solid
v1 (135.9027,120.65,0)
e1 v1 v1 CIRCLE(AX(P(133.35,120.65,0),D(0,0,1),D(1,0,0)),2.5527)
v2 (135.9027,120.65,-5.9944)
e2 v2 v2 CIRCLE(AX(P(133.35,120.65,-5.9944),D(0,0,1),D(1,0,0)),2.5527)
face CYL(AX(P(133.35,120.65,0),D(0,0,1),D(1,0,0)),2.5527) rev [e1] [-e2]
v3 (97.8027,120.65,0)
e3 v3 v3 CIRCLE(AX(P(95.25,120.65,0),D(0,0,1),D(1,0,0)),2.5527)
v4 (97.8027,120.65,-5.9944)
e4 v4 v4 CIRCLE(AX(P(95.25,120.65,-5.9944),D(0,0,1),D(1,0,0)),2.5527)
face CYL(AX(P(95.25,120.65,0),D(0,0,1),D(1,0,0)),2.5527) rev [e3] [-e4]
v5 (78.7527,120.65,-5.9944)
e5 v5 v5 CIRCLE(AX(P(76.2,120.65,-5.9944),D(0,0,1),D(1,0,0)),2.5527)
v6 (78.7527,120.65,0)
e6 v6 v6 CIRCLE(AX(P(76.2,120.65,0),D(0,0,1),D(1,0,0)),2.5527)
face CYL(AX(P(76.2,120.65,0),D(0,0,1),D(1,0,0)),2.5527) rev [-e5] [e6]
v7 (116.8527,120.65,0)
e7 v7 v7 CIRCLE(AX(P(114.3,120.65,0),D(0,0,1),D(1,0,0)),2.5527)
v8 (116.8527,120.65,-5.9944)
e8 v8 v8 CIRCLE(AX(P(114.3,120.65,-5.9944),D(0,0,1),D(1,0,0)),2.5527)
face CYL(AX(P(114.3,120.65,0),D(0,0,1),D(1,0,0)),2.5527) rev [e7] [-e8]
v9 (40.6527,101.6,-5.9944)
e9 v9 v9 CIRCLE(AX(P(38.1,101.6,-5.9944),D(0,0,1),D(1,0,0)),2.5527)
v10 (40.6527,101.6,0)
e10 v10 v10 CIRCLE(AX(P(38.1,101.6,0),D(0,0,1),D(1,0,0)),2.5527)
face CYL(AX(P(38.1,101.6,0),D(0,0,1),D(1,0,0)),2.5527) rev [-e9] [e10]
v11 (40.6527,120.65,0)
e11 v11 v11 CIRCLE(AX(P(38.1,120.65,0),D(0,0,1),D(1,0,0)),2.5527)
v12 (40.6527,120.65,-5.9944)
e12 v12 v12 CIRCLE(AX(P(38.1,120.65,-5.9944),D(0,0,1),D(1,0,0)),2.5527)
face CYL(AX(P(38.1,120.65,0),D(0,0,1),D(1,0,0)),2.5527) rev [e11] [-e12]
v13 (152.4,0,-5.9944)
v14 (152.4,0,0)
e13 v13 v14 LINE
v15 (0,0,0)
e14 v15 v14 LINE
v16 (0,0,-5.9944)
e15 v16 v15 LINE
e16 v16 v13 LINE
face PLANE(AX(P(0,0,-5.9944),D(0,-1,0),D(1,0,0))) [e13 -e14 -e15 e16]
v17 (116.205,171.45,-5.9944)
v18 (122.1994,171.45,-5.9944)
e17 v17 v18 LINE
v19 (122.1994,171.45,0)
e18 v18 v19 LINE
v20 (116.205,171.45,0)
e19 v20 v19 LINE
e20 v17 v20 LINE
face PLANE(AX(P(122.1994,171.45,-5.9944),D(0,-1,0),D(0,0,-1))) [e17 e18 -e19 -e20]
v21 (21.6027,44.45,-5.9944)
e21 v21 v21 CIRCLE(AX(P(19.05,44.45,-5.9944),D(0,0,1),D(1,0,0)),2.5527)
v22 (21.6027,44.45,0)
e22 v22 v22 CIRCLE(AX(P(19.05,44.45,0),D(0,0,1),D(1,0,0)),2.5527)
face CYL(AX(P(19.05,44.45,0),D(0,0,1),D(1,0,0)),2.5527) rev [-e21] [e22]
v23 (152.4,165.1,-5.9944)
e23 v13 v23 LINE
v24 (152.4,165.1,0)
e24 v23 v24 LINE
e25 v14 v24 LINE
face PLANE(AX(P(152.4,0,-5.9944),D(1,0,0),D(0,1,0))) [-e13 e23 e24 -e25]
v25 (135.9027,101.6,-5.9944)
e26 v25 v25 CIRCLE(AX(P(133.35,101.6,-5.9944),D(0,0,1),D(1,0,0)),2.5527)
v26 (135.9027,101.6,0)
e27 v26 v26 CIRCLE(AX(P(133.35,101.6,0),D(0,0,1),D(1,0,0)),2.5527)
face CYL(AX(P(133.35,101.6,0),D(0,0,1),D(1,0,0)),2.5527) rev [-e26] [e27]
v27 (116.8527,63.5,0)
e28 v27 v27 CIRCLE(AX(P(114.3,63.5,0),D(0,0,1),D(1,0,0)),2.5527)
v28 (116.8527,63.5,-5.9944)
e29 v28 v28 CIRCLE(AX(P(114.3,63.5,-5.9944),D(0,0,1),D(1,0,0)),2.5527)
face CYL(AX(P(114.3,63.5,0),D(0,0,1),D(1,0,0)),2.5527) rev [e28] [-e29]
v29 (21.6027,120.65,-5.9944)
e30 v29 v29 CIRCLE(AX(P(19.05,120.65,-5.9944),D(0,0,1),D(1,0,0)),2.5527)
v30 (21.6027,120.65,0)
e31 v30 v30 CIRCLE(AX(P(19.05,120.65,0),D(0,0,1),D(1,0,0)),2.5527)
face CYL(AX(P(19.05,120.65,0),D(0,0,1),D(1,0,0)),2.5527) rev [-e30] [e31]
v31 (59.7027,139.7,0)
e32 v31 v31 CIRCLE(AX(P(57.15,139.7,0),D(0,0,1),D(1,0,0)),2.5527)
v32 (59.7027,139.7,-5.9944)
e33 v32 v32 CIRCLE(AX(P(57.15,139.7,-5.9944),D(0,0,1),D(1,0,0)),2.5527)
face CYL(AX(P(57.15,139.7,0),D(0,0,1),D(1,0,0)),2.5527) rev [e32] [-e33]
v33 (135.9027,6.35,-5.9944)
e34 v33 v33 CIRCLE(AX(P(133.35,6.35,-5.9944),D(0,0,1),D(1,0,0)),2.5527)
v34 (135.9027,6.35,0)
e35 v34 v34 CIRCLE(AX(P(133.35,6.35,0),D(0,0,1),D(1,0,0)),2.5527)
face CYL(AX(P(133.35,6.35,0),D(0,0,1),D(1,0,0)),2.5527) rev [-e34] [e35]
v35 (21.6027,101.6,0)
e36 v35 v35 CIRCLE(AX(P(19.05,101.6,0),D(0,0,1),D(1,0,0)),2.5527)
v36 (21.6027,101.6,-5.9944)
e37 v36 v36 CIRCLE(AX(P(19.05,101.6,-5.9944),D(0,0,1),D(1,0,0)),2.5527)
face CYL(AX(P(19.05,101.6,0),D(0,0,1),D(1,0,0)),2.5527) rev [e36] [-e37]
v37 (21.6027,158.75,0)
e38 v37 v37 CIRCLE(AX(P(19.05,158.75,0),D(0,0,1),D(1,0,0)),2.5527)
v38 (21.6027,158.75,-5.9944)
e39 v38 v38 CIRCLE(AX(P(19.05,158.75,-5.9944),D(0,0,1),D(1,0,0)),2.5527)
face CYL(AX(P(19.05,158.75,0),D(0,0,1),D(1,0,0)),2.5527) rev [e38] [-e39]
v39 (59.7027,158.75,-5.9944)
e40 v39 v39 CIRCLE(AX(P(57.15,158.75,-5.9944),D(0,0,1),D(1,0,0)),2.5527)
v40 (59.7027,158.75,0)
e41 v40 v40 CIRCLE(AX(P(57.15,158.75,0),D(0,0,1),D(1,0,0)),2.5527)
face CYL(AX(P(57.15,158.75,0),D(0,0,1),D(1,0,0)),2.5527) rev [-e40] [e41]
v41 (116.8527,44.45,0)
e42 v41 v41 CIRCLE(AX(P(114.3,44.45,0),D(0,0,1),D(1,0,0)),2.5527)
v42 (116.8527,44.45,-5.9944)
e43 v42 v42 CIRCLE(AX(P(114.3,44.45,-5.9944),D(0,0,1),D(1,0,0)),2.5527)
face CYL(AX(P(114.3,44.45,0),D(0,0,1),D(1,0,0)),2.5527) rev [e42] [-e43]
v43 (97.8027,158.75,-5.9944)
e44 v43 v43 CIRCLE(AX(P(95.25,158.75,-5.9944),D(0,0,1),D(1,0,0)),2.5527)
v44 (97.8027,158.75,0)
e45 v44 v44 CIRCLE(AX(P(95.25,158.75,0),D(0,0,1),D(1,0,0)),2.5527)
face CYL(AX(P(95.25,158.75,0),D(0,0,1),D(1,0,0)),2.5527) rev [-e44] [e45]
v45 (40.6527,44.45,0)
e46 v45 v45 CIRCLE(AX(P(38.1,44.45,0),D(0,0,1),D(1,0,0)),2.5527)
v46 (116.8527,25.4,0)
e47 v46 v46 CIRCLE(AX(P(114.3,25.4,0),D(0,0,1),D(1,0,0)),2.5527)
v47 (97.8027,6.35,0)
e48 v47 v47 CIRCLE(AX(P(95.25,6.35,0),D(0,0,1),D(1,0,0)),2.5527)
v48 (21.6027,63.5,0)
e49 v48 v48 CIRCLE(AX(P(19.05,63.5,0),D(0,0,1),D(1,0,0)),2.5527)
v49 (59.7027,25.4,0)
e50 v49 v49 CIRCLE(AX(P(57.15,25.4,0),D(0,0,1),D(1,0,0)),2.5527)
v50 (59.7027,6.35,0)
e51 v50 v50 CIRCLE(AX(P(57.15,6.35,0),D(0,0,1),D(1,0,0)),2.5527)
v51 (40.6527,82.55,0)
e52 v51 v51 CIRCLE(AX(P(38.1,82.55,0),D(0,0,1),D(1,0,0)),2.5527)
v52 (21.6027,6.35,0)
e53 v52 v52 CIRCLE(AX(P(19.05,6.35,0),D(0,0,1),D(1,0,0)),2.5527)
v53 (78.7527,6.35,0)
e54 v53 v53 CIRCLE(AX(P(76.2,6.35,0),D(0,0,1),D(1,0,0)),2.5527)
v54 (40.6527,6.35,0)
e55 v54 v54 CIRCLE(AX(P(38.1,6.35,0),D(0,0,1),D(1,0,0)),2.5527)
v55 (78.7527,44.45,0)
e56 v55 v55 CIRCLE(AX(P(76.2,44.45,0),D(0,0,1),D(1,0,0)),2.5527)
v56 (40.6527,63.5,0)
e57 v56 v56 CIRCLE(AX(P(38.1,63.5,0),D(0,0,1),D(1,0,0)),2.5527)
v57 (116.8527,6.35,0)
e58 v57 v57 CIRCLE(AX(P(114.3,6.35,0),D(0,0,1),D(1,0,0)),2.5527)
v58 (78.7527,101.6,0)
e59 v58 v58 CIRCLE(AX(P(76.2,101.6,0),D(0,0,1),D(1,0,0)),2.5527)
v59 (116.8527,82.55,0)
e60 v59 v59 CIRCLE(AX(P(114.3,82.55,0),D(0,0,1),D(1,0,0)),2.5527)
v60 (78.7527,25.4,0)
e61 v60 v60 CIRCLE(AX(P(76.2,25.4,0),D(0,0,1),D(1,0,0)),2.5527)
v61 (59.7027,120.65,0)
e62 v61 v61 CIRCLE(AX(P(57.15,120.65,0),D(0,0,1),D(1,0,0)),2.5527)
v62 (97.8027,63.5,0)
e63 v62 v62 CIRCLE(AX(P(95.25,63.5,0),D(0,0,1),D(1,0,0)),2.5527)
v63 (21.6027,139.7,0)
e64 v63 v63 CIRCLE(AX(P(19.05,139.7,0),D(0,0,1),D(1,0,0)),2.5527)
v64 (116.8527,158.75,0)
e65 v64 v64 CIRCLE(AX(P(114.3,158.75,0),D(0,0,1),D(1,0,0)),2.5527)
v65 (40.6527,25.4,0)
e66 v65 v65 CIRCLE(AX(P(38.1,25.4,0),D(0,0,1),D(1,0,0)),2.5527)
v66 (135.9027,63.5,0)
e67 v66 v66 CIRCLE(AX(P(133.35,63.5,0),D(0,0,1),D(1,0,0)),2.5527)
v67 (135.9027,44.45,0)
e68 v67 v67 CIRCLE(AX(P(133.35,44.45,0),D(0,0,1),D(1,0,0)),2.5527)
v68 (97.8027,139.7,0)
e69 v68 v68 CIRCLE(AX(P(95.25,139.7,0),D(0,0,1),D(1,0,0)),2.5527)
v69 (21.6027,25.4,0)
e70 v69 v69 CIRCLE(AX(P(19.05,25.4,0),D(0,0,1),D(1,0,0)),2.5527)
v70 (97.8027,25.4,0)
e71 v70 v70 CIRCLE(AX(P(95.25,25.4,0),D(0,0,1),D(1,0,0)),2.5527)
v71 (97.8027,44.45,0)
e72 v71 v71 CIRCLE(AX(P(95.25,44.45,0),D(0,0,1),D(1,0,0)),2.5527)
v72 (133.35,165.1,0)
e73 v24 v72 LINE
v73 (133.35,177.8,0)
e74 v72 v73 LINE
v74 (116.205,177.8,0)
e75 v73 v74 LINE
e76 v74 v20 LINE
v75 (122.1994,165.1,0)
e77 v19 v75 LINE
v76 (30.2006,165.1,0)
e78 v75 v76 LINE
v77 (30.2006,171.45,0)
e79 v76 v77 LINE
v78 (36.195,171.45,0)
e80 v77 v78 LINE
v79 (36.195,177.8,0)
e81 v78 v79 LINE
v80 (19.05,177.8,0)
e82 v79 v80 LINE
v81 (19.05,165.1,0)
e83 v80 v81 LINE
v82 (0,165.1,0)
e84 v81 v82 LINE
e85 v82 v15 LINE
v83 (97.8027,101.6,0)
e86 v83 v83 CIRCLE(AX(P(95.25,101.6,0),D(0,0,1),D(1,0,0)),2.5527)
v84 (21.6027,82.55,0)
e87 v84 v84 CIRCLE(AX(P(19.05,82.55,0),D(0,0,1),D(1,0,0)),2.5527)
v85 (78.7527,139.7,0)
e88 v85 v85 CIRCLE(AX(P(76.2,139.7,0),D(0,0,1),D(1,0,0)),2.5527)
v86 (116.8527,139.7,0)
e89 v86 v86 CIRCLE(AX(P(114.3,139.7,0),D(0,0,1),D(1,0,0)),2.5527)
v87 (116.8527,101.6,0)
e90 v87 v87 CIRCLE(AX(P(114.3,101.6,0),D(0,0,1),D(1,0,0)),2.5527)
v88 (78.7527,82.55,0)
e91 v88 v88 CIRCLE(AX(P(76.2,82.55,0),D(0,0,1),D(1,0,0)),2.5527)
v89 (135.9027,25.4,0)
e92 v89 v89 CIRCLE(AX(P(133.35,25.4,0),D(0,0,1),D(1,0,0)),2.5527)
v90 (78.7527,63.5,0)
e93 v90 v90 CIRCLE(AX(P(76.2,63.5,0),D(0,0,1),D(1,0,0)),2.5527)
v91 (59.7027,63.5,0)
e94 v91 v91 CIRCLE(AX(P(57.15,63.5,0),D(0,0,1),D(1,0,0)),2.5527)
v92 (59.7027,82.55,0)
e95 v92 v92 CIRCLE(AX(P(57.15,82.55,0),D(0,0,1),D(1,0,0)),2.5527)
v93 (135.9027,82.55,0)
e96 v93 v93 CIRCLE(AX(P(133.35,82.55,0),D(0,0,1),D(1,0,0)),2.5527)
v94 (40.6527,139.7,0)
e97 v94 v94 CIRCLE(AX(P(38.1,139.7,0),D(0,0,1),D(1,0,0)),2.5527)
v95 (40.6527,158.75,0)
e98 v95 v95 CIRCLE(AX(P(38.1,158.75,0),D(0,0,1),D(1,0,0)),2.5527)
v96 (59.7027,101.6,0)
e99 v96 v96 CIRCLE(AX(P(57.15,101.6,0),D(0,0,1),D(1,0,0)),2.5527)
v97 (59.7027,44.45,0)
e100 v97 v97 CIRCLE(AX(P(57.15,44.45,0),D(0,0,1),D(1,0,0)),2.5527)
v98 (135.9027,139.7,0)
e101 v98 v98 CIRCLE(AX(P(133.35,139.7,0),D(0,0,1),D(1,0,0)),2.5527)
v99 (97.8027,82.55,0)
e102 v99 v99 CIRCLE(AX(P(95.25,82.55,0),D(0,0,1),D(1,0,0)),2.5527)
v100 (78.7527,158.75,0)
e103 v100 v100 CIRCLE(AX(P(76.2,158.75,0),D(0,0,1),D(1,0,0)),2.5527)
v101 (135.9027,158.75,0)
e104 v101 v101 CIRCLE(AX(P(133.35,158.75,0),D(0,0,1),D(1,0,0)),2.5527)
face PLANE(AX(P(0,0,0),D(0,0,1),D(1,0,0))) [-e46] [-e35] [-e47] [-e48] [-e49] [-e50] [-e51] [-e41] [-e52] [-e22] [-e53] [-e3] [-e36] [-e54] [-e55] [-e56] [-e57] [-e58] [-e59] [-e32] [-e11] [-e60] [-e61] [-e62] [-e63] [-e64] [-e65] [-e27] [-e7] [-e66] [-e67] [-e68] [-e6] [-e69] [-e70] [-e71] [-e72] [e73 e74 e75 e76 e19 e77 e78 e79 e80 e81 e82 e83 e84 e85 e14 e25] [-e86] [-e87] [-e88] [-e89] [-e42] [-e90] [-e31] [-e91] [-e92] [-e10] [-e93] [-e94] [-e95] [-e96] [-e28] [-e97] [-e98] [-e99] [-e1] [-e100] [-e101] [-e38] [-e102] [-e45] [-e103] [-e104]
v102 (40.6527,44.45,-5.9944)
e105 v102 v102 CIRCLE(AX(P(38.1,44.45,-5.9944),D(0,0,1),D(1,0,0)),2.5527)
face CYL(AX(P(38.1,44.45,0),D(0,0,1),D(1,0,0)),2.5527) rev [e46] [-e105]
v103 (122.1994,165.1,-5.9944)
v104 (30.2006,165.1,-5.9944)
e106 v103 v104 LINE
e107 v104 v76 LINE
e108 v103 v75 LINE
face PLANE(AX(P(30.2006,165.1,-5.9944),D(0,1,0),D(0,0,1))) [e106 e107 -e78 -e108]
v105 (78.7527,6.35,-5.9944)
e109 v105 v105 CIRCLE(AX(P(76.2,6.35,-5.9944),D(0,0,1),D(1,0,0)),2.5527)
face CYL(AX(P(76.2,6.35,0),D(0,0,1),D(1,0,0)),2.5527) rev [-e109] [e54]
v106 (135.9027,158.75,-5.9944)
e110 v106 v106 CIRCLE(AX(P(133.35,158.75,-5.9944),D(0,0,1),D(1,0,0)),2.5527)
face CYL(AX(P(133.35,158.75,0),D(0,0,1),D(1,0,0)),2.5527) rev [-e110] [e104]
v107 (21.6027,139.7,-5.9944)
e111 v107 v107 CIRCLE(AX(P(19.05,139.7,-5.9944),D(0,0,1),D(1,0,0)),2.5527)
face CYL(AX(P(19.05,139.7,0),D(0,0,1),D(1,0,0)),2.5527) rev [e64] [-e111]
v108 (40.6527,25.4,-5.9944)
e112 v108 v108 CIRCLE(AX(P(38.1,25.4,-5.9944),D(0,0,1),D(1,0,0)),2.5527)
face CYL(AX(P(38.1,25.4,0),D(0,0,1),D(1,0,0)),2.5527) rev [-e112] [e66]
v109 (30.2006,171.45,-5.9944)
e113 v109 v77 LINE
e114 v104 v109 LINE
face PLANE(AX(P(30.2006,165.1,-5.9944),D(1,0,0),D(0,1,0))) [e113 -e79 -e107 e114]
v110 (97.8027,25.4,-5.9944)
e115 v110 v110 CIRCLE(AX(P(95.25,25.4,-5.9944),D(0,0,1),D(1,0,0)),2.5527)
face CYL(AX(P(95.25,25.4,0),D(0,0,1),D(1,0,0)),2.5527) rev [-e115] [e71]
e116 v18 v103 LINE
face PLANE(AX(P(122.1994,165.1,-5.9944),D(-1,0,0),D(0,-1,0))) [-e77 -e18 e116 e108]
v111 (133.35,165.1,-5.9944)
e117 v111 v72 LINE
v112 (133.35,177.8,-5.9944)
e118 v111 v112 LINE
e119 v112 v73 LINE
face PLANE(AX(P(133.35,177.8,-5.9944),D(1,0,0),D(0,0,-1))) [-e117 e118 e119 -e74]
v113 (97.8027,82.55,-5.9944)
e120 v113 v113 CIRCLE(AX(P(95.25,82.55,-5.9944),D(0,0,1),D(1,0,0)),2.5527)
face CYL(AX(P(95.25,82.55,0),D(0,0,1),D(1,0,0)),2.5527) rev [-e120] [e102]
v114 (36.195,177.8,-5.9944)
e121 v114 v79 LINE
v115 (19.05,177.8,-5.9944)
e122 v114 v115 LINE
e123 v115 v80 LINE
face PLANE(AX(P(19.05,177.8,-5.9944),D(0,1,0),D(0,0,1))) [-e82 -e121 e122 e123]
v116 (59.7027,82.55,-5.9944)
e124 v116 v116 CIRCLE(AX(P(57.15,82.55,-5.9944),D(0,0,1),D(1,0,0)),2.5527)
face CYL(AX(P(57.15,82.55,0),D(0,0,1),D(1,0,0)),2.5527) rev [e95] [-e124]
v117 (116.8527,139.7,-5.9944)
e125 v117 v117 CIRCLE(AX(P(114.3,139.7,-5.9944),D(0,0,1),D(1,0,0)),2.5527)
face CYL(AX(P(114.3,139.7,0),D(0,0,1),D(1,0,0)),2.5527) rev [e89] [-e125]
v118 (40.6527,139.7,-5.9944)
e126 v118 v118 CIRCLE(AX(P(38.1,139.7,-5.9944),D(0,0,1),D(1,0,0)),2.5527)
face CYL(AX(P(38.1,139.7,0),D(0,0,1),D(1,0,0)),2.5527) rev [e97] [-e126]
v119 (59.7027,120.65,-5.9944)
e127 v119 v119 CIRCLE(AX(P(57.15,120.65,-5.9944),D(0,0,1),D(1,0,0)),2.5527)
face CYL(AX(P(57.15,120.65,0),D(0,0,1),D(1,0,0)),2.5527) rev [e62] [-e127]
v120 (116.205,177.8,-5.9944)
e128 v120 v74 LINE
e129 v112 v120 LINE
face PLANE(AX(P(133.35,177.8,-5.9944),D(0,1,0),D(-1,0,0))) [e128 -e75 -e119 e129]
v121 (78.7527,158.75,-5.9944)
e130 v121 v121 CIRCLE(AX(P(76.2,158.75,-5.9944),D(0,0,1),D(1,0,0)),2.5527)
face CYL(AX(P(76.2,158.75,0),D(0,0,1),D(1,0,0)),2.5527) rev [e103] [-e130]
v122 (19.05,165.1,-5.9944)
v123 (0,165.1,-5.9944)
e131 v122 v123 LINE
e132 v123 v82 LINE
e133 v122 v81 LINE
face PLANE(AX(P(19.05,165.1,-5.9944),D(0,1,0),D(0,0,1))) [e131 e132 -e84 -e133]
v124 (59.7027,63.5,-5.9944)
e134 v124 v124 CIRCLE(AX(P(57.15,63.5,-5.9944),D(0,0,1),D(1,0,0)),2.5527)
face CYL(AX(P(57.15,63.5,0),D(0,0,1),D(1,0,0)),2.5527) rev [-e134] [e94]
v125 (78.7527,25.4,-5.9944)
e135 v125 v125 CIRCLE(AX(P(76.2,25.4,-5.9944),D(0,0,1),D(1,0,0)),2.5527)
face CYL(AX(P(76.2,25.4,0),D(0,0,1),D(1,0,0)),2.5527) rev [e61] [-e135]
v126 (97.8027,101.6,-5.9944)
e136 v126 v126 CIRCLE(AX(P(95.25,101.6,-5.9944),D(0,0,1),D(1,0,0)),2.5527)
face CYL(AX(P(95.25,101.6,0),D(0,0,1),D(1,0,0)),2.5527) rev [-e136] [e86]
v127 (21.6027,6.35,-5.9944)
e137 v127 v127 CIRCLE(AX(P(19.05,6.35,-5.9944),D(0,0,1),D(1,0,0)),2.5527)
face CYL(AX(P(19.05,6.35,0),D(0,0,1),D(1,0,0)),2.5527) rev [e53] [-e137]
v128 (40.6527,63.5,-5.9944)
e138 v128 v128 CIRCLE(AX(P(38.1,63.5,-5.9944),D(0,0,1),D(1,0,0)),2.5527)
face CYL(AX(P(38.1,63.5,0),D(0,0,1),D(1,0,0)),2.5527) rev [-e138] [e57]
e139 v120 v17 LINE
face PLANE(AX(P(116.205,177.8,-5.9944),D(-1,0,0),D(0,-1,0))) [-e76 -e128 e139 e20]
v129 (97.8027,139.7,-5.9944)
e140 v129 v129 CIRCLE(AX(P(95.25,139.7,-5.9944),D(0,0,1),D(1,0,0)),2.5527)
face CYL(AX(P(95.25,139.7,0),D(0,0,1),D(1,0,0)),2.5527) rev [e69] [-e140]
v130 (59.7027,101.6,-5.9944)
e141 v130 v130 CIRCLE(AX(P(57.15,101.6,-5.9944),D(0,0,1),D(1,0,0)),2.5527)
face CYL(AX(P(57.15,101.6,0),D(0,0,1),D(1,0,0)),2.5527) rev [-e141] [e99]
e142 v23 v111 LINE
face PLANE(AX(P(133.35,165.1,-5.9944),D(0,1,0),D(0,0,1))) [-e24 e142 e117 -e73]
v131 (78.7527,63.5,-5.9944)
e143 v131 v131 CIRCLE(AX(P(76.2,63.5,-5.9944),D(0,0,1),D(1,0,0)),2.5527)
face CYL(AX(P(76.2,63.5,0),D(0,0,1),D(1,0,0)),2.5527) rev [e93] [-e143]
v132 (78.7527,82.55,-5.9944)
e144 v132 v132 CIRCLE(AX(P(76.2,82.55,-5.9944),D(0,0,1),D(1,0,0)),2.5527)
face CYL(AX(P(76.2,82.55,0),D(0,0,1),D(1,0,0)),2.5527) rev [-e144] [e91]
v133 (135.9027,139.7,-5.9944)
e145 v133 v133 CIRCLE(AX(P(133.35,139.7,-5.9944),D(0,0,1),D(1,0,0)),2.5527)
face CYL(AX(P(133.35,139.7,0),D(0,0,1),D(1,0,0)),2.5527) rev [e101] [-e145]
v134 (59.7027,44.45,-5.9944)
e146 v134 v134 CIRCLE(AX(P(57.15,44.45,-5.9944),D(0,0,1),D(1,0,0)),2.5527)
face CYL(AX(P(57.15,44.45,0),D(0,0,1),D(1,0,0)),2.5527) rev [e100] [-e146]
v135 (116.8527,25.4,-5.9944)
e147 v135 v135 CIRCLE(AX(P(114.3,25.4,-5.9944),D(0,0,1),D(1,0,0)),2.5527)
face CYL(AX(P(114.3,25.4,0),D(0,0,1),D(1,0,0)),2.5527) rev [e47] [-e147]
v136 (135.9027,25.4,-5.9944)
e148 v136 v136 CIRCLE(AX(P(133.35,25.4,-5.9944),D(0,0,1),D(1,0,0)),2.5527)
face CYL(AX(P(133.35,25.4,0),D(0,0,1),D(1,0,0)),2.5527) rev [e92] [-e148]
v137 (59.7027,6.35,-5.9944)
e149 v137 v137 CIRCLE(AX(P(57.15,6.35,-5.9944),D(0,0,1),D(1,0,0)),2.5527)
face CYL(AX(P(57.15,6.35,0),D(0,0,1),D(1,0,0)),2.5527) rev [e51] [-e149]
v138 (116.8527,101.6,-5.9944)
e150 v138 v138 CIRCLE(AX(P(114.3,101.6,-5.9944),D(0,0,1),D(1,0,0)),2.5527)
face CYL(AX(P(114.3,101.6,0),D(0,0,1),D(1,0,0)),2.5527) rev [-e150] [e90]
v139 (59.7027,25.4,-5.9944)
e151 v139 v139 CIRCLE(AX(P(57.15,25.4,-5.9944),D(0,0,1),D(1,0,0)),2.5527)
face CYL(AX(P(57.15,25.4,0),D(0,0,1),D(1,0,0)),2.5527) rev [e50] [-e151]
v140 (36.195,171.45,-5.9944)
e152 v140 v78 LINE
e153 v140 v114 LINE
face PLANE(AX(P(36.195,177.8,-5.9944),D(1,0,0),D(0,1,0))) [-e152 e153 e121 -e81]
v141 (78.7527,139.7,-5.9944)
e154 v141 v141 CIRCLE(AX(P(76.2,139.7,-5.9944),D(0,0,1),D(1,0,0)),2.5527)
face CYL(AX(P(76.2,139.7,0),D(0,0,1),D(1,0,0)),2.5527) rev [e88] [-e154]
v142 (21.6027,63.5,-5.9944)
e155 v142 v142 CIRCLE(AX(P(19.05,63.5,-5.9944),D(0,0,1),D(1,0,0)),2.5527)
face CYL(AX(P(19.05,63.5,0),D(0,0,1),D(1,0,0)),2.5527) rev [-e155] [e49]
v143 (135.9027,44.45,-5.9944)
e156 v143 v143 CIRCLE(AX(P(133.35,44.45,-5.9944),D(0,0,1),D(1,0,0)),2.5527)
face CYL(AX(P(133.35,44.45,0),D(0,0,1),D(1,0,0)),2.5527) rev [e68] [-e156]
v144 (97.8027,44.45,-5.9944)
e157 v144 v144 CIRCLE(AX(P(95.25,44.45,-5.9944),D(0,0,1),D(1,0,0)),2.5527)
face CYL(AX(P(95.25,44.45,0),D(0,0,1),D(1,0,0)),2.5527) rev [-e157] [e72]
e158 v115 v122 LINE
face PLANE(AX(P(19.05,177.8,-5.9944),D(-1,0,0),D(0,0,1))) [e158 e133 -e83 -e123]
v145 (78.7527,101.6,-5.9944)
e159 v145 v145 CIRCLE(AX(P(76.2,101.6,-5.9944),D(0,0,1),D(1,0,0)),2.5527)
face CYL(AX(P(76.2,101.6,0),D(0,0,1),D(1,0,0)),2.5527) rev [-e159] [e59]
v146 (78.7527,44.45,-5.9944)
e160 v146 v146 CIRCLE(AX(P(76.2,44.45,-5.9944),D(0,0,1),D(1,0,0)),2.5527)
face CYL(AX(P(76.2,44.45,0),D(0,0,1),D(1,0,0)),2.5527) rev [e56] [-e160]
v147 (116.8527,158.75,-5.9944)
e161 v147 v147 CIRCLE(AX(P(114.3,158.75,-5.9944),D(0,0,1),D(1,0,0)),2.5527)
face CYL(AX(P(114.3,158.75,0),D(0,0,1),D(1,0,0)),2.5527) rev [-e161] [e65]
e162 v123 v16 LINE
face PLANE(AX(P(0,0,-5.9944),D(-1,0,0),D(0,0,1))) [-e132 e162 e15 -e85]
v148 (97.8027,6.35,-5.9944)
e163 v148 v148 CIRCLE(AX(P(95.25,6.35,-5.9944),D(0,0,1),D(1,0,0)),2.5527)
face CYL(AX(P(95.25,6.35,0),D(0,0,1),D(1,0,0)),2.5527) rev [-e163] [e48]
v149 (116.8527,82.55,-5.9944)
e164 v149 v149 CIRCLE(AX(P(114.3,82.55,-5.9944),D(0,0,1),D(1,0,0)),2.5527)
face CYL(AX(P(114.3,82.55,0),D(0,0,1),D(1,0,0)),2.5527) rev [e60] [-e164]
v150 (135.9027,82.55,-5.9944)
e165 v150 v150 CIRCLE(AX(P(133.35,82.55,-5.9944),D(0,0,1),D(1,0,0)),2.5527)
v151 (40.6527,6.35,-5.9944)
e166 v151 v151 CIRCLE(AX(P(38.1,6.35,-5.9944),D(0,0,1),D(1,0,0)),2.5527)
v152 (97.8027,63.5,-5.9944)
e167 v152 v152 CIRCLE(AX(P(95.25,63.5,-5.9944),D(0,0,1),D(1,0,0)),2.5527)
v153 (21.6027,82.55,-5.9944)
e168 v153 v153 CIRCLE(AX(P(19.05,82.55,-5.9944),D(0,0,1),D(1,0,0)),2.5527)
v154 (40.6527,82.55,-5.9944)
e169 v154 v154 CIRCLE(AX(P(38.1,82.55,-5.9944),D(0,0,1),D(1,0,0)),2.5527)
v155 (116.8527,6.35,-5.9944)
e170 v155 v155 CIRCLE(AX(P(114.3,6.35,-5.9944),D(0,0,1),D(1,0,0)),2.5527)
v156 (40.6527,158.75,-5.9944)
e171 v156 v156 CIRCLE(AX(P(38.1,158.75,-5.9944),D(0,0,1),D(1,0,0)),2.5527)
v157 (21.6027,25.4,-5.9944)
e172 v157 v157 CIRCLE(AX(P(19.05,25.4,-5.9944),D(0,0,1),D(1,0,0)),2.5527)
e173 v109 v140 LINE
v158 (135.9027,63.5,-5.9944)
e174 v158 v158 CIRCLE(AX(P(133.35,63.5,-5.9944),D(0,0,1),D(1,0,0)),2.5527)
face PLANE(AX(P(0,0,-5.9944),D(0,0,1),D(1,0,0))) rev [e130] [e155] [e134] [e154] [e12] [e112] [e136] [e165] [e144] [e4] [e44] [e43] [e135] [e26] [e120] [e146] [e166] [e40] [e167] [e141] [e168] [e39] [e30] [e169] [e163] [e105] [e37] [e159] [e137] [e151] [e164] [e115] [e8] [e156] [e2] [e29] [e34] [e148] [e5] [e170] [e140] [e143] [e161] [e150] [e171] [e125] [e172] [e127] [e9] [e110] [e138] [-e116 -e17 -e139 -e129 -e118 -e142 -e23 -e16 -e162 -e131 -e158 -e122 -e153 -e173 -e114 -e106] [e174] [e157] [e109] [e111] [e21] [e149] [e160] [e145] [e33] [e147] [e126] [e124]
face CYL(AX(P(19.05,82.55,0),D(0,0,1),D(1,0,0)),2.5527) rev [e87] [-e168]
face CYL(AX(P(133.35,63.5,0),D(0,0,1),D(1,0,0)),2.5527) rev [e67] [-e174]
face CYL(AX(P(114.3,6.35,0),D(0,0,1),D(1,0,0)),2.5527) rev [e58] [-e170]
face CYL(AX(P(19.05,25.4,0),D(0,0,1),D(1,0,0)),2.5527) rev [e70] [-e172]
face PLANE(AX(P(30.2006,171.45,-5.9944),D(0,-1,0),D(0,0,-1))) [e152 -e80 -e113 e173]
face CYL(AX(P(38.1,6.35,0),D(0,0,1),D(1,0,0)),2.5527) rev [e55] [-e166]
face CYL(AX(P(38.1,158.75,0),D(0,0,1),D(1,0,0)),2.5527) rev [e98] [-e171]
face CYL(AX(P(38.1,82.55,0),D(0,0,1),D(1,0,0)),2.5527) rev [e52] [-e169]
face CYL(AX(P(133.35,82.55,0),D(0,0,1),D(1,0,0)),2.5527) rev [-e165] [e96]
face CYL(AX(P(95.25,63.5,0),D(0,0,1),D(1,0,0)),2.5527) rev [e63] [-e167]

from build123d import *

# Parameters (mm, degrees)
BOSS_EXTRUDE2_DEPTH     = 5.9944
F_1_4_20_TAPPED_HOLE1_D = 5.1054
FILL_START              = -5.9944
FILL_PATTERN1_OUTLINE_R = 2.5527
FILL_PATTERN1_DEPTH     = 5.9944


# Read off the part's stored shape, not the designer's step: Fill Pattern1
with BuildPart() as part:
    # Sketch1 → Boss-Extrude2 (new body)
    with BuildSketch(Plane.XY):
        Polygon((0, 0), (152.4, 0), (152.4, 165.1), (133.35, 165.1), (133.35, 177.8), (116.205, 177.8), (116.205, 171.45), (122.1994, 171.45), (122.1994, 165.1), (30.2006, 165.1), (30.2006, 171.45), (36.195, 171.45), (36.195, 177.8), (19.05, 177.8), (19.05, 165.1), (0, 165.1), align=None)
    extrude(amount=-BOSS_EXTRUDE2_DEPTH)

    # 1/4-20 Tapped Hole1 (through all)
    with Locations(Plane.XY):
        with Locations((76.2, 82.55)):
            Hole(F_1_4_20_TAPPED_HOLE1_D / 2)

    # Fill Pattern1 outline → Fill Pattern1 (cut)
    with BuildSketch(Plane.XY.offset(FILL_START)):
        with Locations((95.25, 63.5)):
            Circle(FILL_PATTERN1_OUTLINE_R)
        with Locations((76.2, 63.5)):
            Circle(FILL_PATTERN1_OUTLINE_R)
        with Locations((57.15, 63.5)):
            Circle(FILL_PATTERN1_OUTLINE_R)
        with Locations((57.15, 82.55)):
            Circle(FILL_PATTERN1_OUTLINE_R)
        with Locations((57.15, 101.6)):
            Circle(FILL_PATTERN1_OUTLINE_R)
        with Locations((76.2, 101.6)):
            Circle(FILL_PATTERN1_OUTLINE_R)
        with Locations((95.25, 101.6)):
            Circle(FILL_PATTERN1_OUTLINE_R)
        with Locations((95.25, 82.55)):
            Circle(FILL_PATTERN1_OUTLINE_R)
        with Locations((114.3, 44.45)):
            Circle(FILL_PATTERN1_OUTLINE_R)
        with Locations((95.25, 44.45)):
            Circle(FILL_PATTERN1_OUTLINE_R)
        with Locations((76.2, 44.45)):
            Circle(FILL_PATTERN1_OUTLINE_R)
        with Locations((57.15, 44.45)):
            Circle(FILL_PATTERN1_OUTLINE_R)
        with Locations((38.1, 44.45)):
            Circle(FILL_PATTERN1_OUTLINE_R)
        with Locations((38.1, 63.5)):
            Circle(FILL_PATTERN1_OUTLINE_R)
        with Locations((38.1, 82.55)):
            Circle(FILL_PATTERN1_OUTLINE_R)
        with Locations((38.1, 101.6)):
            Circle(FILL_PATTERN1_OUTLINE_R)
        with Locations((38.1, 120.65)):
            Circle(FILL_PATTERN1_OUTLINE_R)
        with Locations((57.15, 120.65)):
            Circle(FILL_PATTERN1_OUTLINE_R)
        with Locations((76.2, 120.65)):
            Circle(FILL_PATTERN1_OUTLINE_R)
        with Locations((95.25, 120.65)):
            Circle(FILL_PATTERN1_OUTLINE_R)
        with Locations((114.3, 120.65)):
            Circle(FILL_PATTERN1_OUTLINE_R)
        with Locations((114.3, 101.6)):
            Circle(FILL_PATTERN1_OUTLINE_R)
        with Locations((114.3, 82.55)):
            Circle(FILL_PATTERN1_OUTLINE_R)
        with Locations((114.3, 63.5)):
            Circle(FILL_PATTERN1_OUTLINE_R)
        with Locations((133.35, 25.4)):
            Circle(FILL_PATTERN1_OUTLINE_R)
        with Locations((114.3, 25.4)):
            Circle(FILL_PATTERN1_OUTLINE_R)
        with Locations((95.25, 25.4)):
            Circle(FILL_PATTERN1_OUTLINE_R)
        with Locations((76.2, 25.4)):
            Circle(FILL_PATTERN1_OUTLINE_R)
        with Locations((57.15, 25.4)):
            Circle(FILL_PATTERN1_OUTLINE_R)
        with Locations((38.1, 25.4)):
            Circle(FILL_PATTERN1_OUTLINE_R)
        with Locations((19.05, 25.4)):
            Circle(FILL_PATTERN1_OUTLINE_R)
        with Locations((19.05, 44.45)):
            Circle(FILL_PATTERN1_OUTLINE_R)
        with Locations((19.05, 63.5)):
            Circle(FILL_PATTERN1_OUTLINE_R)
        with Locations((19.05, 82.55)):
            Circle(FILL_PATTERN1_OUTLINE_R)
        with Locations((19.05, 101.6)):
            Circle(FILL_PATTERN1_OUTLINE_R)
        with Locations((19.05, 120.65)):
            Circle(FILL_PATTERN1_OUTLINE_R)
        with Locations((19.05, 139.7)):
            Circle(FILL_PATTERN1_OUTLINE_R)
        with Locations((38.1, 139.7)):
            Circle(FILL_PATTERN1_OUTLINE_R)
        with Locations((57.15, 139.7)):
            Circle(FILL_PATTERN1_OUTLINE_R)
        with Locations((76.2, 139.7)):
            Circle(FILL_PATTERN1_OUTLINE_R)
        with Locations((95.25, 139.7)):
            Circle(FILL_PATTERN1_OUTLINE_R)
        with Locations((114.3, 139.7)):
            Circle(FILL_PATTERN1_OUTLINE_R)
        with Locations((133.35, 139.7)):
            Circle(FILL_PATTERN1_OUTLINE_R)
        with Locations((133.35, 120.65)):
            Circle(FILL_PATTERN1_OUTLINE_R)
        with Locations((133.35, 101.6)):
            Circle(FILL_PATTERN1_OUTLINE_R)
        with Locations((133.35, 82.55)):
            Circle(FILL_PATTERN1_OUTLINE_R)
        with Locations((133.35, 63.5)):
            Circle(FILL_PATTERN1_OUTLINE_R)
        with Locations((133.35, 44.45)):
            Circle(FILL_PATTERN1_OUTLINE_R)
        with Locations((133.35, 6.35)):
            Circle(FILL_PATTERN1_OUTLINE_R)
        with Locations((114.3, 6.35)):
            Circle(FILL_PATTERN1_OUTLINE_R)
        with Locations((95.25, 6.35)):
            Circle(FILL_PATTERN1_OUTLINE_R)
        with Locations((76.2, 6.35)):
            Circle(FILL_PATTERN1_OUTLINE_R)
        with Locations((57.15, 6.35)):
            Circle(FILL_PATTERN1_OUTLINE_R)
        with Locations((38.1, 6.35)):
            Circle(FILL_PATTERN1_OUTLINE_R)
        with Locations((19.05, 6.35)):
            Circle(FILL_PATTERN1_OUTLINE_R)
        with Locations((19.05, 158.75)):
            Circle(FILL_PATTERN1_OUTLINE_R)
        with Locations((38.1, 158.75)):
            Circle(FILL_PATTERN1_OUTLINE_R)
        with Locations((57.15, 158.75)):
            Circle(FILL_PATTERN1_OUTLINE_R)
        with Locations((76.2, 158.75)):
            Circle(FILL_PATTERN1_OUTLINE_R)
        with Locations((95.25, 158.75)):
            Circle(FILL_PATTERN1_OUTLINE_R)
        with Locations((114.3, 158.75)):
            Circle(FILL_PATTERN1_OUTLINE_R)
        with Locations((133.35, 158.75)):
            Circle(FILL_PATTERN1_OUTLINE_R)
    extrude(amount=FILL_PATTERN1_DEPTH, mode=Mode.SUBTRACT)


solid = part.part
